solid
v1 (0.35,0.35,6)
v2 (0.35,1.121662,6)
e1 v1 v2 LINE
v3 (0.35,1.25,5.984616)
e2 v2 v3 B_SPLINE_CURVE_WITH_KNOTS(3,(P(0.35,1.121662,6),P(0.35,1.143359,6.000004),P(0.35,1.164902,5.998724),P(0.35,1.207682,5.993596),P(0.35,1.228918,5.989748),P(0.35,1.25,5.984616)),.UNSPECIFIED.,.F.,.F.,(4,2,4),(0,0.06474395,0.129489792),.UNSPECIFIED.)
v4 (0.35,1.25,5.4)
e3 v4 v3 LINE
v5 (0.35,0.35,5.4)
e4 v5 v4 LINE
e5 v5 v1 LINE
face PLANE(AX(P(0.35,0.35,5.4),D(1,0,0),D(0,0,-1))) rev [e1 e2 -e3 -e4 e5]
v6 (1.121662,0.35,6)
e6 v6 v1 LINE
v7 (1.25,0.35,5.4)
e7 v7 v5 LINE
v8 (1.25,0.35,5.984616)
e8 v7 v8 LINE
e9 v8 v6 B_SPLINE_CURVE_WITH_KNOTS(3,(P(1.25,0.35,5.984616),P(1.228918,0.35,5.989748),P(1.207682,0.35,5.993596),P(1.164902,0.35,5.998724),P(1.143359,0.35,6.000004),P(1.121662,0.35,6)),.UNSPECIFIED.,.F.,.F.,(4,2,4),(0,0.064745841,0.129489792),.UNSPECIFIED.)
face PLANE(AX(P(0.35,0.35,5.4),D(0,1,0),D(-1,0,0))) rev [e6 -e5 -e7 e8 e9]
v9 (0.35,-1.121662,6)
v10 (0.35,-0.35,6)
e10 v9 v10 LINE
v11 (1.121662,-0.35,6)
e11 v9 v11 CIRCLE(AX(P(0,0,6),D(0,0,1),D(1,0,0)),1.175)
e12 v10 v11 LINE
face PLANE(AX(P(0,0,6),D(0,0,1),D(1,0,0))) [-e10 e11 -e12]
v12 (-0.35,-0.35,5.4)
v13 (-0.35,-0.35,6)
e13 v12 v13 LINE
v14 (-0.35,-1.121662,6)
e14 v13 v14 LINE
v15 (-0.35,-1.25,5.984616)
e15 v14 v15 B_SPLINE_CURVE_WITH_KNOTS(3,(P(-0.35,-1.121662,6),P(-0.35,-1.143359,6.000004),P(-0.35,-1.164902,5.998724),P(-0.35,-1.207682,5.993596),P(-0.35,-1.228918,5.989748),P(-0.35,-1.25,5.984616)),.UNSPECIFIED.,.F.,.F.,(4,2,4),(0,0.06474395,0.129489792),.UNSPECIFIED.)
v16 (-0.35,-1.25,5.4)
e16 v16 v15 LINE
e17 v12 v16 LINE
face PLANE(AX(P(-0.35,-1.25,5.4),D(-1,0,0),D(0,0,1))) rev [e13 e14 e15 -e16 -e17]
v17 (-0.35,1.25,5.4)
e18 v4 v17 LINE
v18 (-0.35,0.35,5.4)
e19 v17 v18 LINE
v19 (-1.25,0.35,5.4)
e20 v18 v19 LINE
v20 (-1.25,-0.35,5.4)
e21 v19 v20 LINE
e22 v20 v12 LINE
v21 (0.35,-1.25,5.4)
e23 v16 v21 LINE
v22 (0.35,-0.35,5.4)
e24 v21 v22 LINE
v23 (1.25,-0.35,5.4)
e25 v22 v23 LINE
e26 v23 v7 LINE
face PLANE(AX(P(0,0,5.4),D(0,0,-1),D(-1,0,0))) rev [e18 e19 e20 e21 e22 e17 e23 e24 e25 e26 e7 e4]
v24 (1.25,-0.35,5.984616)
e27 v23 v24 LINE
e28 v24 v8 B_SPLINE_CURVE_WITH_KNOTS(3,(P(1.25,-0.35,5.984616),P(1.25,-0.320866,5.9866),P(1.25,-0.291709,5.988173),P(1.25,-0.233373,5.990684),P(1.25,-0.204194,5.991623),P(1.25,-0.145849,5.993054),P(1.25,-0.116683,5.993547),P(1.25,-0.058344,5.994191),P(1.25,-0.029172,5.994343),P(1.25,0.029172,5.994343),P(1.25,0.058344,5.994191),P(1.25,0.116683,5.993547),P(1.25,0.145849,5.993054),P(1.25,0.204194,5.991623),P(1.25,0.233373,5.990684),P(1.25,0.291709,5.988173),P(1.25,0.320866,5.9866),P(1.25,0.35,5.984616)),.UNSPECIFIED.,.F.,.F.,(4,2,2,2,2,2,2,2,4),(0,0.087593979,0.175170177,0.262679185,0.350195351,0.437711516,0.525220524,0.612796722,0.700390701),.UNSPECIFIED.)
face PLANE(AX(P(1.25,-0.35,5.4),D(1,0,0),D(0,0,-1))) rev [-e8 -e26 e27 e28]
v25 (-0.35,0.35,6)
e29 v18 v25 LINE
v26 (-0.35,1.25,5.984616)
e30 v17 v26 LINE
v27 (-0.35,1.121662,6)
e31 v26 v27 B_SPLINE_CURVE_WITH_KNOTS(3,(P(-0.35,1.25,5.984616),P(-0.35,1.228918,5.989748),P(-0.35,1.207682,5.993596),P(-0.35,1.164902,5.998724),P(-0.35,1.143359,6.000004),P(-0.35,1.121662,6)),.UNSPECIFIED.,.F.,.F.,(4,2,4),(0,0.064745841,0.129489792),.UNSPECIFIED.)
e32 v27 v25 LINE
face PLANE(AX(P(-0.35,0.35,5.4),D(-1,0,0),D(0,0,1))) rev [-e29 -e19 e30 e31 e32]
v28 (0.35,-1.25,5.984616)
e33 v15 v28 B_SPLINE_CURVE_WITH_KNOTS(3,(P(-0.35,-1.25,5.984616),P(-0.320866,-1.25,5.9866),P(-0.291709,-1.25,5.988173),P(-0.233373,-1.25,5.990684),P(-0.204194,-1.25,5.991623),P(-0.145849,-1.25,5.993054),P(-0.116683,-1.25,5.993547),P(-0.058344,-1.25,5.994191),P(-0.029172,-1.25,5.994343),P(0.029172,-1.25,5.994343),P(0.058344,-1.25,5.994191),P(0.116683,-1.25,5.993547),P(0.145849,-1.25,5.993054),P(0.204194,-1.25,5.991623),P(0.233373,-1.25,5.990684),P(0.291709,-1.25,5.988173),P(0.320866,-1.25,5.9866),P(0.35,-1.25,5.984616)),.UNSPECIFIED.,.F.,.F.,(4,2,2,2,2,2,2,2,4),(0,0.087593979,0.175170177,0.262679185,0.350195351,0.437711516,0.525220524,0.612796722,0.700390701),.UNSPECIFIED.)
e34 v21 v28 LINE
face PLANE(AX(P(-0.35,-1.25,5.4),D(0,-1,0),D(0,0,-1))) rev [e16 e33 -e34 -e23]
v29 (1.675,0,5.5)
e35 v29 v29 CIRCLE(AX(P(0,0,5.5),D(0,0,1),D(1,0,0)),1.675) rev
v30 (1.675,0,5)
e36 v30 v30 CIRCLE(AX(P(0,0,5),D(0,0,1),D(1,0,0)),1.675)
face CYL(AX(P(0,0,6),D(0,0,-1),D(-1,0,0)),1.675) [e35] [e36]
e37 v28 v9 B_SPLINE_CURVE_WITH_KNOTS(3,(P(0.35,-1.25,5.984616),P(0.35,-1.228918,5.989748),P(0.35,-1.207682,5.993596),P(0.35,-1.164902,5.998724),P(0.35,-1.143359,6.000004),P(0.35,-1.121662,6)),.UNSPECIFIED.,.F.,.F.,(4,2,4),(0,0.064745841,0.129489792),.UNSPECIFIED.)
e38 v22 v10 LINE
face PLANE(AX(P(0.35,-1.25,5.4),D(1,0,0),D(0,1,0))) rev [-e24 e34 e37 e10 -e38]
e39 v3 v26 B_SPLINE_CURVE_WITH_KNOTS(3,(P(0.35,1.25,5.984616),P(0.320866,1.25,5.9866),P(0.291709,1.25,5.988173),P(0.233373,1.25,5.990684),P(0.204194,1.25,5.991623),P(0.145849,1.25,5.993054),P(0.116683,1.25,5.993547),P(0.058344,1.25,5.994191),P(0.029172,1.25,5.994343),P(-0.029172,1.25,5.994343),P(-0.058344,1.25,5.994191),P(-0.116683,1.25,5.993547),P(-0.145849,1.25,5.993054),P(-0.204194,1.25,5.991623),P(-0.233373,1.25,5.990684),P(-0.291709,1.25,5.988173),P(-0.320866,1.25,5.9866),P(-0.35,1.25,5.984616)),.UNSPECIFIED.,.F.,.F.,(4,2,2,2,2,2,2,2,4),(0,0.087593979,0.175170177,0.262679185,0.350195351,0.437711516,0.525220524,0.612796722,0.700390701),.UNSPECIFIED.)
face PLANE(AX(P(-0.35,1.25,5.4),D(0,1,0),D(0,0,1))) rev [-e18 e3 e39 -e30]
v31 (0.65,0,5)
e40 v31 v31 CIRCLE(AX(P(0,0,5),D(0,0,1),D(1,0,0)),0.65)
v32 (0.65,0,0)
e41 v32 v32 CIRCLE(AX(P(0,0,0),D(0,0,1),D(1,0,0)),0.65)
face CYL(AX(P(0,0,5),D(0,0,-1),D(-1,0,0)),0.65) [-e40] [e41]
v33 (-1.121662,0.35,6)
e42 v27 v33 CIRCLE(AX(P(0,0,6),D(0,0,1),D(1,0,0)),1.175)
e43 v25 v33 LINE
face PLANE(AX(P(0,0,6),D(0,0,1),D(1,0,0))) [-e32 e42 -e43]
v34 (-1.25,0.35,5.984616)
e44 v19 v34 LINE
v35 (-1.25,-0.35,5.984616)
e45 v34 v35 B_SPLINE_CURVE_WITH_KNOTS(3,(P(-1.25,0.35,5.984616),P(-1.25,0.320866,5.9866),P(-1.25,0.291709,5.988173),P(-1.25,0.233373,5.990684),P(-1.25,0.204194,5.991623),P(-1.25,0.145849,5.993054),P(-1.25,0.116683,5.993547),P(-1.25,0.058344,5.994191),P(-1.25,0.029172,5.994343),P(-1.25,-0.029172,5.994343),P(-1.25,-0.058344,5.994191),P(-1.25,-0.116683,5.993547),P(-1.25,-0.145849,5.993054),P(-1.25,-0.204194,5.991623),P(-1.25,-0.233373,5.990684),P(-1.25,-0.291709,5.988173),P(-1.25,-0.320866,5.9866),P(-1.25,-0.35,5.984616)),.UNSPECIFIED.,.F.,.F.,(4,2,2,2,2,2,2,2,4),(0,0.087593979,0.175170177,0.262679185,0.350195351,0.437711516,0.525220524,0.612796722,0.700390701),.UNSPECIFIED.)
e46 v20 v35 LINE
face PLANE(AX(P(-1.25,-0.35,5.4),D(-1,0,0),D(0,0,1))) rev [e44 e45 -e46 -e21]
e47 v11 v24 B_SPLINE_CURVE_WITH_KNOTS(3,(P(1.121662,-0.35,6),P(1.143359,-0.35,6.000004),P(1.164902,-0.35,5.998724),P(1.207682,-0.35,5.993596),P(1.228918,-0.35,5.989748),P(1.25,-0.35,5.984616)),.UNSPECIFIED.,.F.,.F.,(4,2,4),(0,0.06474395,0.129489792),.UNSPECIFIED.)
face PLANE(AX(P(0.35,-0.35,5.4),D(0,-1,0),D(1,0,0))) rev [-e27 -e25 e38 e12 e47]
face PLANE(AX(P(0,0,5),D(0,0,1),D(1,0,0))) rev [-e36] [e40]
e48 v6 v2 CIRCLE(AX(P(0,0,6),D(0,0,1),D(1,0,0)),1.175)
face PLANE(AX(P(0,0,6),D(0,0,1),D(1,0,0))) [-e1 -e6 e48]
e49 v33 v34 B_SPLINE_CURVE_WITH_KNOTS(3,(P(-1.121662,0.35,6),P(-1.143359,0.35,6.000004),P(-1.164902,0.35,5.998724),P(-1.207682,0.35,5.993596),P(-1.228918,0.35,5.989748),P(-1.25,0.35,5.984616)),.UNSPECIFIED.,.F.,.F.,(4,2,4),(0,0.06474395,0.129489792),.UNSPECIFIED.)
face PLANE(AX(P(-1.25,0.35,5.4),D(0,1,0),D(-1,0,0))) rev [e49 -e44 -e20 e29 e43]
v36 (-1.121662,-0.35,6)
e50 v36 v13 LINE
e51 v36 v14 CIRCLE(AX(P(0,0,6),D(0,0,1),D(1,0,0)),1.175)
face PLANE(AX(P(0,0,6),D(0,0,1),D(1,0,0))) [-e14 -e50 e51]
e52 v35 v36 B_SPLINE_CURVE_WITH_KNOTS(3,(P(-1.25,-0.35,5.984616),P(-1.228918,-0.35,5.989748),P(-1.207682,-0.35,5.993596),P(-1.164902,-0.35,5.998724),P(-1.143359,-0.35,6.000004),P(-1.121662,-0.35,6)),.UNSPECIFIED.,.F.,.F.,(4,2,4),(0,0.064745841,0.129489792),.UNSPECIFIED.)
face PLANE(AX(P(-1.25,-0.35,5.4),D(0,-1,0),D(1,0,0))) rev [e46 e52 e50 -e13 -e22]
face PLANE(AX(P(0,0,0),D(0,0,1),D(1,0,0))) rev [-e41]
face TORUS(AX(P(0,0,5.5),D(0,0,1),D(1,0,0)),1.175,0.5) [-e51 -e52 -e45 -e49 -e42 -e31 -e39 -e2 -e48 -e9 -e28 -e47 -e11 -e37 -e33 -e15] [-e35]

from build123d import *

# Parameters (mm, degrees)
CROQUIS1_R              = 0.65
SALIENTE_EXTRUIR1_DEPTH = 5
CROQUIS2_R              = 1.675
SALIENTE_EXTRUIR2_DEPTH = 1
CORTAR_EXTRUIR1_DEPTH   = 0.6
REDONDEO1_R             = 0.5


with BuildPart() as part:
    # Croquis1 → Saliente-Extruir1 (new body)
    with BuildSketch(Plane.XY):
        Circle(CROQUIS1_R)
    extrude(amount=SALIENTE_EXTRUIR1_DEPTH)

    # Croquis2 → Saliente-Extruir2 (add)
    with BuildSketch(Plane.XY.offset(5)):
        Circle(CROQUIS2_R)
    extrude(amount=SALIENTE_EXTRUIR2_DEPTH)

    # Croquis3 → Cortar-Extruir1 (cut)
    with BuildSketch(Plane.XY.offset(6)):
        Polygon((0.35, 0.35), (1.25, 0.35), (1.25, -0.35), (0.35, -0.35), (0.35, -1.25), (-0.35, -1.25), (-0.35, -0.35), (-1.25, -0.35), (-1.25, 0.35), (-0.35, 0.35), (-0.35, 1.25), (0.35, 1.25), align=None)
    extrude(amount=-CORTAR_EXTRUIR1_DEPTH, mode=Mode.SUBTRACT)

    # Redondeo1
    # the kernel refuses this fillet: 0.5 mm, written as the material it takes off along each edge
    with BuildSketch(Plane(origin=(0, 0, 6), x_dir=(1, 0, 0), z_dir=(0, -1, 0))) as redondeo1_piece_1:
        with BuildLine():
            CenterArc((1.675 - REDONDEO1_R, -REDONDEO1_R), REDONDEO1_R, 0, 90)
            Line((1.675 - REDONDEO1_R, 0), (1.675, 0))
            Line((1.675, 0), (1.675, -REDONDEO1_R))
        make_face()
    revolve(axis=Axis((0, 0, 6), (0, 0, 1)), mode=Mode.SUBTRACT)


solid = part.part
